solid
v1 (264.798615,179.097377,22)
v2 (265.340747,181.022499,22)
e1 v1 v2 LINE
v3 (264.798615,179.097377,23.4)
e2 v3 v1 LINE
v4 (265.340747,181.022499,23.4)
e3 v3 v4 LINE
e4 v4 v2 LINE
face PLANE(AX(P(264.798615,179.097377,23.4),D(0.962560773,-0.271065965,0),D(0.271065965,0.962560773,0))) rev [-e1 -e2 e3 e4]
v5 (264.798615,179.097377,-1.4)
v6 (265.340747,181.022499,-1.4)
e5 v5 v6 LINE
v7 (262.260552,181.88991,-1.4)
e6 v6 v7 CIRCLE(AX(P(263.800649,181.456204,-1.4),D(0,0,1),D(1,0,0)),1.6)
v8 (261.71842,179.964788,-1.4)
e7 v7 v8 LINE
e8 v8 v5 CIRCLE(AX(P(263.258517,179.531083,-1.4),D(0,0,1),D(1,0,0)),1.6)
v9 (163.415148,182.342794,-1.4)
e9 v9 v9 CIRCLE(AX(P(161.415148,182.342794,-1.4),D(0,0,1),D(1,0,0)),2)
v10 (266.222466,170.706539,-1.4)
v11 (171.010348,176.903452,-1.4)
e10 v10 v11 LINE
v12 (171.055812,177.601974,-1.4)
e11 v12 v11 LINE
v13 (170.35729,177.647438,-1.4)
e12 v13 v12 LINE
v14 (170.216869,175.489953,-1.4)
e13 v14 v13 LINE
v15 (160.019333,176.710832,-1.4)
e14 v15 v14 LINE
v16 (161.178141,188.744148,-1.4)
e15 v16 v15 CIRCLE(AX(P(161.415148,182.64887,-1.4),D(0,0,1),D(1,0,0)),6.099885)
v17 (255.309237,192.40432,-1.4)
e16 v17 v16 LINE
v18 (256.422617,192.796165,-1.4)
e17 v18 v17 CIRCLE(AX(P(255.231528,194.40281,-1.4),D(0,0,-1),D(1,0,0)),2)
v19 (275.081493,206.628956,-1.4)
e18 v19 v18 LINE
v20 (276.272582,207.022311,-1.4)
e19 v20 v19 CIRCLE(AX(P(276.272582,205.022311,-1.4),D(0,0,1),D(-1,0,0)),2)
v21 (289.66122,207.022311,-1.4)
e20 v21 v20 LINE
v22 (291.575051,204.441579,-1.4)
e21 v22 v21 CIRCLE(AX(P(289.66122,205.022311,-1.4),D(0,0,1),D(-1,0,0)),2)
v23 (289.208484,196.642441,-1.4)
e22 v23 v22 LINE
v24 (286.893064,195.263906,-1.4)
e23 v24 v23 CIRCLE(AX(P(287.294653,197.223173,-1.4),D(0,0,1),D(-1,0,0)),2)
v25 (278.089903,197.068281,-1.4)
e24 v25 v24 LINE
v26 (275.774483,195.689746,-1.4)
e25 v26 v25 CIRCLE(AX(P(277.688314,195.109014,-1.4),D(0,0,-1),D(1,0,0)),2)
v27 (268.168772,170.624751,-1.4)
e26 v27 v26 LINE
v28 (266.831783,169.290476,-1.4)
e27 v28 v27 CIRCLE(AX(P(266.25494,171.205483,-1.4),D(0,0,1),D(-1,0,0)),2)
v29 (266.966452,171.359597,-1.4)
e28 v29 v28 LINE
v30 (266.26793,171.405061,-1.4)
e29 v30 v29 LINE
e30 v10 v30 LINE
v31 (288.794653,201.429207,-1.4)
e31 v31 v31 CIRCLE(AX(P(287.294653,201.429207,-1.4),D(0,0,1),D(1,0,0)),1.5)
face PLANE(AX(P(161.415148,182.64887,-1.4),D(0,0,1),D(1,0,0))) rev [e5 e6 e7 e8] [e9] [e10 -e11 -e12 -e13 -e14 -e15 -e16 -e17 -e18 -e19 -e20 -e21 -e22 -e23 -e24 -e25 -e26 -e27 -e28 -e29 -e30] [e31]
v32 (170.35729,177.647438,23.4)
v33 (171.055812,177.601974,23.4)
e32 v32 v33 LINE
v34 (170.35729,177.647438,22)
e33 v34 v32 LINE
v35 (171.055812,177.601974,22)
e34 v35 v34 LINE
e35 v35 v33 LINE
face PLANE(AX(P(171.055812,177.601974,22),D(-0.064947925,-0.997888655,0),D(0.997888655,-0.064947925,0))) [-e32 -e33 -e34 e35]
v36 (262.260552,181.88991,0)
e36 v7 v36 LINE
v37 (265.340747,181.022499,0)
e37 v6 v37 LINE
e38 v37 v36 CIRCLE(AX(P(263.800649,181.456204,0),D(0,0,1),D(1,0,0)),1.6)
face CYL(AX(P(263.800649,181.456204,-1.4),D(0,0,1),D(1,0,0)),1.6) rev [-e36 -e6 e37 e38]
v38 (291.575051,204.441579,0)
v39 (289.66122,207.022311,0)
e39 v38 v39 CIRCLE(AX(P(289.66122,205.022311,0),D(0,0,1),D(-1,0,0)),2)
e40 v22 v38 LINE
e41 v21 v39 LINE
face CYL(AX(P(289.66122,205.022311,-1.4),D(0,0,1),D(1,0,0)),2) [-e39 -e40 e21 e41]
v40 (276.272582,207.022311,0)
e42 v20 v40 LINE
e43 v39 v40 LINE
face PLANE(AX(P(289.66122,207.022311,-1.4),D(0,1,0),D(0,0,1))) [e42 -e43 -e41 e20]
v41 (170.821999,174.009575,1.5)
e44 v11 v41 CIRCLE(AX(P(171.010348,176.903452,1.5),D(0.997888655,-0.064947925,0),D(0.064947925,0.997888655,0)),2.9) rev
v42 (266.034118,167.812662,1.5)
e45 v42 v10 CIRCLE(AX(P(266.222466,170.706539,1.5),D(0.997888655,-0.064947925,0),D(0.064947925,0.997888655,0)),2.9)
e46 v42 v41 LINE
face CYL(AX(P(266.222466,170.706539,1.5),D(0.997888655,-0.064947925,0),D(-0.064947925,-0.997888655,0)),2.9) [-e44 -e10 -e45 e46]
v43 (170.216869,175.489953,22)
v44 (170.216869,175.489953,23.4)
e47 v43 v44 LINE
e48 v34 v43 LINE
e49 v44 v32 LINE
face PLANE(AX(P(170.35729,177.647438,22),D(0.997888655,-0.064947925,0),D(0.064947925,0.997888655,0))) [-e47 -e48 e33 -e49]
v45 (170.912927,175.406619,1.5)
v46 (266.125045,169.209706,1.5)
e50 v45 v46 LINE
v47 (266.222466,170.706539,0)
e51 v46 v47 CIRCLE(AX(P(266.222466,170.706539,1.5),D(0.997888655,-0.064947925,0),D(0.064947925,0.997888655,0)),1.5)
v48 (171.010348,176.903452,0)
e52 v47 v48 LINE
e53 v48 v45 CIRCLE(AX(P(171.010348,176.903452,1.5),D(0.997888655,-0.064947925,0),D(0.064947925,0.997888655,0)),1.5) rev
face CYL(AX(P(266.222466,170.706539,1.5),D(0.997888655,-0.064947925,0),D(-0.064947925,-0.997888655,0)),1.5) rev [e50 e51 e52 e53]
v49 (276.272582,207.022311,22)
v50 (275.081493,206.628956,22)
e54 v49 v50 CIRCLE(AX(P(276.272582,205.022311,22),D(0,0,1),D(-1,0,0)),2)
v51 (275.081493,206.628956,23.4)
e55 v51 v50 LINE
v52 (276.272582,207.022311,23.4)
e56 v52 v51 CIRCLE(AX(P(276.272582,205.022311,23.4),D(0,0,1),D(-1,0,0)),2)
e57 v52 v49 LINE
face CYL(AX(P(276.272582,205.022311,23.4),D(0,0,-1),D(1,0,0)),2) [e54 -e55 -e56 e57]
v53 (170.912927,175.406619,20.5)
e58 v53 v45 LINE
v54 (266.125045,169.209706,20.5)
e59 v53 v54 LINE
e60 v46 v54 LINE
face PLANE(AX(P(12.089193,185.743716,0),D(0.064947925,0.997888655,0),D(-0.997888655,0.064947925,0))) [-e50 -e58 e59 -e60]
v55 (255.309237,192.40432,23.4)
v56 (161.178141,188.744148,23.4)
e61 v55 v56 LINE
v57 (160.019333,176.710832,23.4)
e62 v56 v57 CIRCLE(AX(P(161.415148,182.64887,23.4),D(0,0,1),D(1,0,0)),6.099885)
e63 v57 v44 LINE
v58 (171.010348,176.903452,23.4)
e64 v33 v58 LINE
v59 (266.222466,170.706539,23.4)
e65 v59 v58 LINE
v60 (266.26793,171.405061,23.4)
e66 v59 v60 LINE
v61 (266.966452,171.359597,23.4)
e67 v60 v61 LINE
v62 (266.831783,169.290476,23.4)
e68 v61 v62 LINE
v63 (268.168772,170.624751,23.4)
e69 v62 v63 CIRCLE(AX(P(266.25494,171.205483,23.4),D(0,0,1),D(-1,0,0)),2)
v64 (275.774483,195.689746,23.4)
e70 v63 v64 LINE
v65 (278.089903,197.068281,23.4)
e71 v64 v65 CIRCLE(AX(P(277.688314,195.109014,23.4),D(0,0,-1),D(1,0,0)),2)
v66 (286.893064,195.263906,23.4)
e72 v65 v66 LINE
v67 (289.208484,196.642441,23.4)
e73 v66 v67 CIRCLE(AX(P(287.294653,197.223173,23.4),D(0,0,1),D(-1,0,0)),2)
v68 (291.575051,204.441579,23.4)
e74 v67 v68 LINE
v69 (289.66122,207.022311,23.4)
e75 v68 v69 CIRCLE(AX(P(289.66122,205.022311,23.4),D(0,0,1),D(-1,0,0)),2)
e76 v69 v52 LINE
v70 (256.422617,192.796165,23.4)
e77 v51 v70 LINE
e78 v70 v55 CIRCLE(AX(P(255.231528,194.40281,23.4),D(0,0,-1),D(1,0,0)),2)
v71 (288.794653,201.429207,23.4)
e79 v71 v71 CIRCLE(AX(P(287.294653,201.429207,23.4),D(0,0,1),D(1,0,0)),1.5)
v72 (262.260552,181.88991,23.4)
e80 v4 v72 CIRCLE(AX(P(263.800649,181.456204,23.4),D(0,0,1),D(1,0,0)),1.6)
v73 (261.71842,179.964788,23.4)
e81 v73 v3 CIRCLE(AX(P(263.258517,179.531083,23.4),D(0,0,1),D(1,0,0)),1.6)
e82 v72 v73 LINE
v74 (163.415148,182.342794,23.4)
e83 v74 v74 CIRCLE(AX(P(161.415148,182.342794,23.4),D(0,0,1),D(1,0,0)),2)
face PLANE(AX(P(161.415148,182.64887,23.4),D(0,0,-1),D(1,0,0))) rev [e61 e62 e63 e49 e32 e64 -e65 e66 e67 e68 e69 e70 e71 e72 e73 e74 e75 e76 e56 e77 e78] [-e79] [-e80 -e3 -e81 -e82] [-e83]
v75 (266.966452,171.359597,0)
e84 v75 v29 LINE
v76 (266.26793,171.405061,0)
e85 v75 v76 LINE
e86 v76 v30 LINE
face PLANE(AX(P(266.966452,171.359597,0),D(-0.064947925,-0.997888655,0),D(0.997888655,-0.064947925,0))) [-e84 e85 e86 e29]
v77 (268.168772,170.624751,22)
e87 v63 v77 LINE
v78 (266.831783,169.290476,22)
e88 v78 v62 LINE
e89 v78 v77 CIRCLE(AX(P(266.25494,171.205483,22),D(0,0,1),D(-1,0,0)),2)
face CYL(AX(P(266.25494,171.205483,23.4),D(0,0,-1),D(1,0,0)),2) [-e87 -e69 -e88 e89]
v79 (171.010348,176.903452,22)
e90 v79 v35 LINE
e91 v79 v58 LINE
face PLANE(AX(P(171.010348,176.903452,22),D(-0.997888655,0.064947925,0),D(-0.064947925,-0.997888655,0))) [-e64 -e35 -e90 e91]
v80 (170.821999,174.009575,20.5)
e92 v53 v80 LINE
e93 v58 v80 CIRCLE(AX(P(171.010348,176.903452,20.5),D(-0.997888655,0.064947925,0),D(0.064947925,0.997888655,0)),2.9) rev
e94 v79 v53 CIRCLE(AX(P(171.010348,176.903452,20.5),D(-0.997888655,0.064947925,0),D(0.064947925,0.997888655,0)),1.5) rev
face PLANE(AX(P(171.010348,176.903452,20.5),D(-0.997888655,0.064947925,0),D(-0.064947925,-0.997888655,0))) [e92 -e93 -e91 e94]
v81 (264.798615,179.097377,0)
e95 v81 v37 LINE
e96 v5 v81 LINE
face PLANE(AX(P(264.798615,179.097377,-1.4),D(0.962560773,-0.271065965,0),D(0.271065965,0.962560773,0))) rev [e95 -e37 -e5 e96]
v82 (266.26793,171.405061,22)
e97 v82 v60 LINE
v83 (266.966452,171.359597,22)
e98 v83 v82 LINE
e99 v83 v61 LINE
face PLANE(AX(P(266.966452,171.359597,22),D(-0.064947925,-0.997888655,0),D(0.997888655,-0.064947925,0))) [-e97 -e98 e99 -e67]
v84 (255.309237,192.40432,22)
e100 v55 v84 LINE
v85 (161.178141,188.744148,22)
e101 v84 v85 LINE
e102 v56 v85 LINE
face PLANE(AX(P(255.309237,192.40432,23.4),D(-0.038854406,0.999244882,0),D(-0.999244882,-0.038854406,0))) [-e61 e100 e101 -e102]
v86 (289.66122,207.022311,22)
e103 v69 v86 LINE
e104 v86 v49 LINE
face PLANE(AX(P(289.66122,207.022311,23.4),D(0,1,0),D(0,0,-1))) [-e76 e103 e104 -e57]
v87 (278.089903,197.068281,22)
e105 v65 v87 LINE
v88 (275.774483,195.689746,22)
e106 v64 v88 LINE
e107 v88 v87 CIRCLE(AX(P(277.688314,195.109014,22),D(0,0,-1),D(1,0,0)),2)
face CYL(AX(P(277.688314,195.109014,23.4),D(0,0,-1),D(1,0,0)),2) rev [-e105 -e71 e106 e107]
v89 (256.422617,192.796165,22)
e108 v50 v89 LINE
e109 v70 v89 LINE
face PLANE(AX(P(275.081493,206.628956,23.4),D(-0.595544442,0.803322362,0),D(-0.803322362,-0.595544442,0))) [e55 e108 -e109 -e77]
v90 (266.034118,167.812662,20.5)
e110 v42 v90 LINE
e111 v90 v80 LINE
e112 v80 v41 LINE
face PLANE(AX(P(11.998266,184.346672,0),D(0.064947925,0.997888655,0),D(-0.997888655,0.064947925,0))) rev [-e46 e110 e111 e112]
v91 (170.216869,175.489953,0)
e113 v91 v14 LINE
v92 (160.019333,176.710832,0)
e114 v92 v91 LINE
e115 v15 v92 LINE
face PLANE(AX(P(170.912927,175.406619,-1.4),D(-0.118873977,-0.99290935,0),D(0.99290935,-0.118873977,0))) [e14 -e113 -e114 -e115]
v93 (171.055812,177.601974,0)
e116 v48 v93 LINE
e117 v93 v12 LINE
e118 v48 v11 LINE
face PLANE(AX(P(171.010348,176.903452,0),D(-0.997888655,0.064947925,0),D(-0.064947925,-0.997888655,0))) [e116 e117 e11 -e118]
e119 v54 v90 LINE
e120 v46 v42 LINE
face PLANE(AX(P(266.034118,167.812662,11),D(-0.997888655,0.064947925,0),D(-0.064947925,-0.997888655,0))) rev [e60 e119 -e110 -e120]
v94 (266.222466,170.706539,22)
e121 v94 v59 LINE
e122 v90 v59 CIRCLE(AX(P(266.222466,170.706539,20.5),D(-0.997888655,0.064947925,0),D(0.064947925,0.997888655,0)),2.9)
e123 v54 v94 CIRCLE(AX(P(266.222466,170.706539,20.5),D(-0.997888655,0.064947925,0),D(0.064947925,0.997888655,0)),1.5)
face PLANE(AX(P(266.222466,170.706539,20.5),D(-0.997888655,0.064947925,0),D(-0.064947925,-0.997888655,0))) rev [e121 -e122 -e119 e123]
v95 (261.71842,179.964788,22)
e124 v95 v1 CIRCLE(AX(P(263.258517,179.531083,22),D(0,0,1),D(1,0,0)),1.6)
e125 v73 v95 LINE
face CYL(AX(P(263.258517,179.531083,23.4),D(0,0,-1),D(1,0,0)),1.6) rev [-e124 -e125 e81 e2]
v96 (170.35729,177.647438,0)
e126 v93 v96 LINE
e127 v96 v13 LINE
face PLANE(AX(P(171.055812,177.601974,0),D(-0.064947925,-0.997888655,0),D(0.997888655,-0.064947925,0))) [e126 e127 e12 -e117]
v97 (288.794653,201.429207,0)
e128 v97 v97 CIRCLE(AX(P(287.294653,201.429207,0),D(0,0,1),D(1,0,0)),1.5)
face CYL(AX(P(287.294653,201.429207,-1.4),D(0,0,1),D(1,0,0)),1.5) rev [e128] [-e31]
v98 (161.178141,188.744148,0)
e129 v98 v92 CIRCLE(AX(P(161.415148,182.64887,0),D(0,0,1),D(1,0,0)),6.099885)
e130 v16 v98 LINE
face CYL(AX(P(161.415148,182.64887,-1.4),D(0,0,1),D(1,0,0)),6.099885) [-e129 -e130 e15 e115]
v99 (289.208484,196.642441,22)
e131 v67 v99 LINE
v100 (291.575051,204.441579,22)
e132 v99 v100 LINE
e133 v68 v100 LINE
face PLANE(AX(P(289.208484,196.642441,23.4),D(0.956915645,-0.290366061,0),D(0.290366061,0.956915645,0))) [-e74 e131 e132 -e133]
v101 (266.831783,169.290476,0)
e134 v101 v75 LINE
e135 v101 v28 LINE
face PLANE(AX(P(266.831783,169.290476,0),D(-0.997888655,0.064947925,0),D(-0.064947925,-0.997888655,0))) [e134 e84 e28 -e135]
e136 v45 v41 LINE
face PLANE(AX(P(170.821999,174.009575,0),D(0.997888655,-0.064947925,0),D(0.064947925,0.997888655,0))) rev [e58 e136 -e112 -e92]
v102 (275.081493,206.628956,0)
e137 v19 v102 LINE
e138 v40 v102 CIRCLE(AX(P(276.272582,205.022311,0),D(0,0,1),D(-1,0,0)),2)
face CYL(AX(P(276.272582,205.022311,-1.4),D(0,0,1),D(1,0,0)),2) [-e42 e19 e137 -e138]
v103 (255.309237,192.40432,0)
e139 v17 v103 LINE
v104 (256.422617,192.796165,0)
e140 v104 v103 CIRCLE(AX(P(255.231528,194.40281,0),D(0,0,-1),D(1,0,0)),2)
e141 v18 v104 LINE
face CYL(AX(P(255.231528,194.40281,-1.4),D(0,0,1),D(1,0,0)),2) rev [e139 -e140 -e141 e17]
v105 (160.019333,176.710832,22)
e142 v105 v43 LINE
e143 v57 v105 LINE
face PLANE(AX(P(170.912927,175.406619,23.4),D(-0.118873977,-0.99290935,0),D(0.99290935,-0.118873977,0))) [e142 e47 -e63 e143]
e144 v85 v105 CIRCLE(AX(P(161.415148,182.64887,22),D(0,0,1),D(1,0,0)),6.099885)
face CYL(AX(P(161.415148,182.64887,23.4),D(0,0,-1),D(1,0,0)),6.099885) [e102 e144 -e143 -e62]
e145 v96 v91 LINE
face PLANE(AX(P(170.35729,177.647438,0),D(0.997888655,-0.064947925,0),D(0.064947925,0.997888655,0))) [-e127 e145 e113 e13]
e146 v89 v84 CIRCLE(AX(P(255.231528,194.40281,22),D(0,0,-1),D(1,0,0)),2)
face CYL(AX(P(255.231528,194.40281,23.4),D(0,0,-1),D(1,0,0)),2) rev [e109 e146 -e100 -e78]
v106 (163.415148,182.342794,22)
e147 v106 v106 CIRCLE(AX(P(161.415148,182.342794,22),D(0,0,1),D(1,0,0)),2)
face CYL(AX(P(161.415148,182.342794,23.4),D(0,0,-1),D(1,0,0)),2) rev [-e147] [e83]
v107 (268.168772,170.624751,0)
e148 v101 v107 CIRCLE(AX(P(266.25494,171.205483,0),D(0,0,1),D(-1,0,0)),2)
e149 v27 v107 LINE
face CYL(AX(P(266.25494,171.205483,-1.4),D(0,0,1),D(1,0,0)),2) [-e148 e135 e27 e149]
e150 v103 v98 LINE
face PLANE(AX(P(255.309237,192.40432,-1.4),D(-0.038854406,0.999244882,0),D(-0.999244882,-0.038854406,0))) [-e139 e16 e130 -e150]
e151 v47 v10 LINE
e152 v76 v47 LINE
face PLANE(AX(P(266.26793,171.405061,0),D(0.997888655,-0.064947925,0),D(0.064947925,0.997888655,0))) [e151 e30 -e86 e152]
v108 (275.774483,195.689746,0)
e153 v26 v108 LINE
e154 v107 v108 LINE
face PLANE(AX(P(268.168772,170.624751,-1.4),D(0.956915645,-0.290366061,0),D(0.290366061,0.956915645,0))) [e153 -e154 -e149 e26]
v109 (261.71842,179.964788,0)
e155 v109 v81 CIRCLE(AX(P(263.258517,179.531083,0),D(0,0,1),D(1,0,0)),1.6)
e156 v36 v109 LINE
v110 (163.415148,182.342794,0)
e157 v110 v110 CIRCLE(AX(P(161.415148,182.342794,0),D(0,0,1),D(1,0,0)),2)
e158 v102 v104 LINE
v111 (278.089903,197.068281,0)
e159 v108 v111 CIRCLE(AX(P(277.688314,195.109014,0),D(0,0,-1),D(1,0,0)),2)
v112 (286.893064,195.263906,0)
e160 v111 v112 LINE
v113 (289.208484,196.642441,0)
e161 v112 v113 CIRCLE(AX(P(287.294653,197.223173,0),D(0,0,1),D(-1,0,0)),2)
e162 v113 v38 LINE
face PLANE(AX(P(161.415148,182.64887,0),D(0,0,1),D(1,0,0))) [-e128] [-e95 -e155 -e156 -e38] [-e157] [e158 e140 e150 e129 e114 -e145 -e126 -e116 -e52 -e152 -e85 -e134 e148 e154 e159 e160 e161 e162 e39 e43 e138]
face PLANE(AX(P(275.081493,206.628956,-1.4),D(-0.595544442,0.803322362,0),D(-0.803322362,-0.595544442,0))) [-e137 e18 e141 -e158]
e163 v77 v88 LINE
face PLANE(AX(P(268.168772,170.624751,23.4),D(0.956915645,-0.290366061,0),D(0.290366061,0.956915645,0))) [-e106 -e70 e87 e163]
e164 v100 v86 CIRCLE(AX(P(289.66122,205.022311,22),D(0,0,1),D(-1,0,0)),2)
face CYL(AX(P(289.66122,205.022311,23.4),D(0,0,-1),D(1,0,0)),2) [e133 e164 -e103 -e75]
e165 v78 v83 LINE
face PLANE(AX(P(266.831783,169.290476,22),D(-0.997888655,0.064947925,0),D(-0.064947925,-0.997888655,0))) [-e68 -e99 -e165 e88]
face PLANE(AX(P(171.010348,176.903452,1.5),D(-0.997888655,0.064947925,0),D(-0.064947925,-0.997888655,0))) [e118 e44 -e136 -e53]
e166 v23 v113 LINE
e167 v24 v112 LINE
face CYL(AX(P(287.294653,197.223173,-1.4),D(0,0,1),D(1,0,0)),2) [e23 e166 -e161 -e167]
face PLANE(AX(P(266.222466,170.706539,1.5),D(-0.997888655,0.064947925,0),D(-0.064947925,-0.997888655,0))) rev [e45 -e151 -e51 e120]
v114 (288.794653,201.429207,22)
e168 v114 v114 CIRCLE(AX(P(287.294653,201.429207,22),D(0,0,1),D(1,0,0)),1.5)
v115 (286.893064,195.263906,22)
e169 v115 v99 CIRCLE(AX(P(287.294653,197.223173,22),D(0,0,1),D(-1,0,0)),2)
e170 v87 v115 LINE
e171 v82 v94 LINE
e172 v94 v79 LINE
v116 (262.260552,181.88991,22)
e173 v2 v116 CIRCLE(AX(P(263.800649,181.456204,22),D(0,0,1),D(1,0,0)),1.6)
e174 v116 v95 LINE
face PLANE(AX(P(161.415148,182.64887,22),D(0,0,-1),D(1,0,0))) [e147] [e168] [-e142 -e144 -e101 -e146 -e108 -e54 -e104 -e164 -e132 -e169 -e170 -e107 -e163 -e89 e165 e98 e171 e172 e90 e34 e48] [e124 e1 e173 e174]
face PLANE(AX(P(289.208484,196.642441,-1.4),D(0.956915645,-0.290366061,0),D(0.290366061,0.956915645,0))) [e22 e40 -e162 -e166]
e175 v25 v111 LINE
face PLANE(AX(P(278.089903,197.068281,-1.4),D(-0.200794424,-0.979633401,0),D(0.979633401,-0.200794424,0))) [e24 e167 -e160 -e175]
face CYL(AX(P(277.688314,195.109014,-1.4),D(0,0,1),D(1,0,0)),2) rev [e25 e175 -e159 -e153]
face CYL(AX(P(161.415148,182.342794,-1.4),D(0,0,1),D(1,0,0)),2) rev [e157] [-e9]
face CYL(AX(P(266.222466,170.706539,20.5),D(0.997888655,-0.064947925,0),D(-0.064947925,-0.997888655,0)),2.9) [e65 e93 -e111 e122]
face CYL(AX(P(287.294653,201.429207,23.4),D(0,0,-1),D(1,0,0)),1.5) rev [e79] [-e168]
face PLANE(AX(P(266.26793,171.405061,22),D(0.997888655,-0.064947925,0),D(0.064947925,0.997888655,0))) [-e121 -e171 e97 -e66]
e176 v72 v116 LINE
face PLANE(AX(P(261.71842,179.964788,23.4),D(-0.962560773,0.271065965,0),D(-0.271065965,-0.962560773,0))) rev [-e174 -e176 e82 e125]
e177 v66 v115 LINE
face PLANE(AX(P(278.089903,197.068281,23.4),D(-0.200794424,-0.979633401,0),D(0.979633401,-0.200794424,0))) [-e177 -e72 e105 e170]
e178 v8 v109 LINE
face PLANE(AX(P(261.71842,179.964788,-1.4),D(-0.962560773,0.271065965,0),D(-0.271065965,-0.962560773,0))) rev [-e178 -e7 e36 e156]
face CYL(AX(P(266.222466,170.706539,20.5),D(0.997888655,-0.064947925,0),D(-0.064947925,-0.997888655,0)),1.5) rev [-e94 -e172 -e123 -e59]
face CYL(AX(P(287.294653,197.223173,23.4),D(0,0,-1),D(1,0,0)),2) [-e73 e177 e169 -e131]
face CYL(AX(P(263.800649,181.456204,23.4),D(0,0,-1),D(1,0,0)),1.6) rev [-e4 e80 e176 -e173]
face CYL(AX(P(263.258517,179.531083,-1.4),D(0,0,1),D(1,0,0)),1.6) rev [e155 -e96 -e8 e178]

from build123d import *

# Parameters (mm, degrees)
SKETCH1_R                     = 1.5
SKETCH1_R_2                   = 2
BASE_FLANGE1_DEPTH            = 1.4
EDGE_FLANGE1_STRIP_W          = 8.6
EDGE_FLANGE1_STRIP_H          = 1.4
EDGE_FLANGE1_STRIP_CUT_DEPTH  = 95.413569059
EDGE_FLANGE1_RELIEF_W         = 9.3
EDGE_FLANGE1_RELIEF_H         = 0.7
EDGE_FLANGE1_RELIEF_CUT_DEPTH = 1.4
EDGE_FLANGE1_DEPTH            = 95.413569059


# Sheet-metal steps are written as plain solids
with BuildPart() as part:
    # Sketch1 → Base-Flange1 (new body)
    with BuildSketch(Plane.XY):
        with BuildLine():
            Line((170.912926542, 175.40661908), (266.125044601, 169.209705713))
            ThreePointArc((266.125044601, 169.209705713), (267.39344589, 169.561157821), (268.168771741, 170.624750901))
            Line((268.168771741, 170.624750901), (275.774482778, 195.689745971))
            ThreePointArc((275.774482778, 195.689745971), (276.665177338, 196.827499007), (278.089902914, 197.068280651))
            Line((278.089902914, 197.068280651), (286.893064256, 195.263905966))
            ThreePointArc((286.893064256, 195.263905966), (288.317789833, 195.50468761), (289.208484393, 196.642440646))
            Line((289.208484393, 196.642440646), (291.575051406, 204.441578719))
            ThreePointArc((291.575051406, 204.441578719), (291.26768584, 206.213641138), (289.661220117, 207.02231084))
            Line((289.661220117, 207.02231084), (276.272582238, 207.02231084))
            ThreePointArc((276.272582238, 207.02231084), (275.645401821, 206.921427667), (275.081493354, 206.628955565))
            Line((275.081493354, 206.628955565), (256.422617181, 192.796164997))
            ThreePointArc((256.422617181, 192.796164997), (255.8954918, 192.516238104), (255.30923711, 192.404319956))
            Line((255.30923711, 192.404319956), (161.178140888, 188.744148243))
            ThreePointArc((161.178140888, 188.744148243), (155.343352432, 183.233583314), (160.019332793, 176.710831608))
            Line((160.019332793, 176.710831608), (170.912926542, 175.40661908))
        make_face()
        with Locations((287.294653103, 201.429207007)):
            Circle(SKETCH1_R, mode=Mode.SUBTRACT)
        with Locations((161.415148292, 182.342793615)):
            Circle(SKETCH1_R_2, mode=Mode.SUBTRACT)
        with BuildLine():
            Line((261.718420137, 179.964788264), (262.260552067, 181.889909811))
            ThreePointArc((262.260552067, 181.889909811), (264.234354849, 182.996301504), (265.340746542, 181.022498723))
            Line((265.340746542, 181.022498723), (264.798614613, 179.097377176))
            ThreePointArc((264.798614613, 179.097377176), (262.824811831, 177.990985482), (261.718420137, 179.964788264))
        make_face(mode=Mode.SUBTRACT)
    extrude(amount=-BASE_FLANGE1_DEPTH)

    # Edge-Flange1 strip (across the edge) → Edge-Flange1 strip cut (cut)
    with BuildSketch(Plane(origin=(170.912926542, 175.40661908, 0), x_dir=(0.06494792541912509, 0.9978886546021816, 3.4914813388431334e-15), z_dir=(0.9978886546021816, -0.06494792541912509, 0))):
        with Locations((-2.8, -0.7)):
            Rectangle(EDGE_FLANGE1_STRIP_W, EDGE_FLANGE1_STRIP_H)
    extrude(amount=EDGE_FLANGE1_STRIP_CUT_DEPTH, mode=Mode.SUBTRACT)

    # Edge-Flange1 relief (on the sheet) → Edge-Flange1 relief cut (cut)
    with BuildSketch(Plane(origin=(171.01034843, 176.903452062, 0), x_dir=(0.06494792541912509, 0.9978886546021816, 6.982962677686267e-15), z_dir=(0, 0, 1))):
        with Locations((-3.95, 0.35)):
            Rectangle(EDGE_FLANGE1_RELIEF_W, EDGE_FLANGE1_RELIEF_H)
        with Locations((-3.95, -95.763569059)):
            Rectangle(EDGE_FLANGE1_RELIEF_W, EDGE_FLANGE1_RELIEF_H)
    extrude(amount=-EDGE_FLANGE1_RELIEF_CUT_DEPTH, mode=Mode.SUBTRACT)

    # Edge-Flange1 section (across the edge) → Edge-Flange1 (add)
    with BuildSketch(Plane(origin=(170.912926542, 175.40661908, 0), x_dir=(0.06494792541912509, 0.9978886546021816, 3.4914813388431334e-15), z_dir=(0.9978886546021816, -0.06494792541912509, 0))):
        with BuildLine():
            Line((-1.4, 1.5), (-1.4, 11))
            Line((-1.4, 11), (0, 11))
            Line((0, 11), (0, 1.5))
            ThreePointArc((0, 1.5), (0.439339828, 0.439339828), (1.5, 0))
            Line((1.5, 0), (1.5, -1.4))
            ThreePointArc((1.5, -1.4), (-0.550609665, -0.550609665), (-1.4, 1.5))
        make_face()
    extrude(amount=EDGE_FLANGE1_DEPTH)

    # Mirror1: part across plane


with BuildPart() as part_1:
    add(part.part)
    add(part.part.mirror(Plane(origin=(170.821999446, 174.009574964, 11), x_dir=(1, 0, 0), z_dir=(0, 0, -1))))


solid = part_1.part
